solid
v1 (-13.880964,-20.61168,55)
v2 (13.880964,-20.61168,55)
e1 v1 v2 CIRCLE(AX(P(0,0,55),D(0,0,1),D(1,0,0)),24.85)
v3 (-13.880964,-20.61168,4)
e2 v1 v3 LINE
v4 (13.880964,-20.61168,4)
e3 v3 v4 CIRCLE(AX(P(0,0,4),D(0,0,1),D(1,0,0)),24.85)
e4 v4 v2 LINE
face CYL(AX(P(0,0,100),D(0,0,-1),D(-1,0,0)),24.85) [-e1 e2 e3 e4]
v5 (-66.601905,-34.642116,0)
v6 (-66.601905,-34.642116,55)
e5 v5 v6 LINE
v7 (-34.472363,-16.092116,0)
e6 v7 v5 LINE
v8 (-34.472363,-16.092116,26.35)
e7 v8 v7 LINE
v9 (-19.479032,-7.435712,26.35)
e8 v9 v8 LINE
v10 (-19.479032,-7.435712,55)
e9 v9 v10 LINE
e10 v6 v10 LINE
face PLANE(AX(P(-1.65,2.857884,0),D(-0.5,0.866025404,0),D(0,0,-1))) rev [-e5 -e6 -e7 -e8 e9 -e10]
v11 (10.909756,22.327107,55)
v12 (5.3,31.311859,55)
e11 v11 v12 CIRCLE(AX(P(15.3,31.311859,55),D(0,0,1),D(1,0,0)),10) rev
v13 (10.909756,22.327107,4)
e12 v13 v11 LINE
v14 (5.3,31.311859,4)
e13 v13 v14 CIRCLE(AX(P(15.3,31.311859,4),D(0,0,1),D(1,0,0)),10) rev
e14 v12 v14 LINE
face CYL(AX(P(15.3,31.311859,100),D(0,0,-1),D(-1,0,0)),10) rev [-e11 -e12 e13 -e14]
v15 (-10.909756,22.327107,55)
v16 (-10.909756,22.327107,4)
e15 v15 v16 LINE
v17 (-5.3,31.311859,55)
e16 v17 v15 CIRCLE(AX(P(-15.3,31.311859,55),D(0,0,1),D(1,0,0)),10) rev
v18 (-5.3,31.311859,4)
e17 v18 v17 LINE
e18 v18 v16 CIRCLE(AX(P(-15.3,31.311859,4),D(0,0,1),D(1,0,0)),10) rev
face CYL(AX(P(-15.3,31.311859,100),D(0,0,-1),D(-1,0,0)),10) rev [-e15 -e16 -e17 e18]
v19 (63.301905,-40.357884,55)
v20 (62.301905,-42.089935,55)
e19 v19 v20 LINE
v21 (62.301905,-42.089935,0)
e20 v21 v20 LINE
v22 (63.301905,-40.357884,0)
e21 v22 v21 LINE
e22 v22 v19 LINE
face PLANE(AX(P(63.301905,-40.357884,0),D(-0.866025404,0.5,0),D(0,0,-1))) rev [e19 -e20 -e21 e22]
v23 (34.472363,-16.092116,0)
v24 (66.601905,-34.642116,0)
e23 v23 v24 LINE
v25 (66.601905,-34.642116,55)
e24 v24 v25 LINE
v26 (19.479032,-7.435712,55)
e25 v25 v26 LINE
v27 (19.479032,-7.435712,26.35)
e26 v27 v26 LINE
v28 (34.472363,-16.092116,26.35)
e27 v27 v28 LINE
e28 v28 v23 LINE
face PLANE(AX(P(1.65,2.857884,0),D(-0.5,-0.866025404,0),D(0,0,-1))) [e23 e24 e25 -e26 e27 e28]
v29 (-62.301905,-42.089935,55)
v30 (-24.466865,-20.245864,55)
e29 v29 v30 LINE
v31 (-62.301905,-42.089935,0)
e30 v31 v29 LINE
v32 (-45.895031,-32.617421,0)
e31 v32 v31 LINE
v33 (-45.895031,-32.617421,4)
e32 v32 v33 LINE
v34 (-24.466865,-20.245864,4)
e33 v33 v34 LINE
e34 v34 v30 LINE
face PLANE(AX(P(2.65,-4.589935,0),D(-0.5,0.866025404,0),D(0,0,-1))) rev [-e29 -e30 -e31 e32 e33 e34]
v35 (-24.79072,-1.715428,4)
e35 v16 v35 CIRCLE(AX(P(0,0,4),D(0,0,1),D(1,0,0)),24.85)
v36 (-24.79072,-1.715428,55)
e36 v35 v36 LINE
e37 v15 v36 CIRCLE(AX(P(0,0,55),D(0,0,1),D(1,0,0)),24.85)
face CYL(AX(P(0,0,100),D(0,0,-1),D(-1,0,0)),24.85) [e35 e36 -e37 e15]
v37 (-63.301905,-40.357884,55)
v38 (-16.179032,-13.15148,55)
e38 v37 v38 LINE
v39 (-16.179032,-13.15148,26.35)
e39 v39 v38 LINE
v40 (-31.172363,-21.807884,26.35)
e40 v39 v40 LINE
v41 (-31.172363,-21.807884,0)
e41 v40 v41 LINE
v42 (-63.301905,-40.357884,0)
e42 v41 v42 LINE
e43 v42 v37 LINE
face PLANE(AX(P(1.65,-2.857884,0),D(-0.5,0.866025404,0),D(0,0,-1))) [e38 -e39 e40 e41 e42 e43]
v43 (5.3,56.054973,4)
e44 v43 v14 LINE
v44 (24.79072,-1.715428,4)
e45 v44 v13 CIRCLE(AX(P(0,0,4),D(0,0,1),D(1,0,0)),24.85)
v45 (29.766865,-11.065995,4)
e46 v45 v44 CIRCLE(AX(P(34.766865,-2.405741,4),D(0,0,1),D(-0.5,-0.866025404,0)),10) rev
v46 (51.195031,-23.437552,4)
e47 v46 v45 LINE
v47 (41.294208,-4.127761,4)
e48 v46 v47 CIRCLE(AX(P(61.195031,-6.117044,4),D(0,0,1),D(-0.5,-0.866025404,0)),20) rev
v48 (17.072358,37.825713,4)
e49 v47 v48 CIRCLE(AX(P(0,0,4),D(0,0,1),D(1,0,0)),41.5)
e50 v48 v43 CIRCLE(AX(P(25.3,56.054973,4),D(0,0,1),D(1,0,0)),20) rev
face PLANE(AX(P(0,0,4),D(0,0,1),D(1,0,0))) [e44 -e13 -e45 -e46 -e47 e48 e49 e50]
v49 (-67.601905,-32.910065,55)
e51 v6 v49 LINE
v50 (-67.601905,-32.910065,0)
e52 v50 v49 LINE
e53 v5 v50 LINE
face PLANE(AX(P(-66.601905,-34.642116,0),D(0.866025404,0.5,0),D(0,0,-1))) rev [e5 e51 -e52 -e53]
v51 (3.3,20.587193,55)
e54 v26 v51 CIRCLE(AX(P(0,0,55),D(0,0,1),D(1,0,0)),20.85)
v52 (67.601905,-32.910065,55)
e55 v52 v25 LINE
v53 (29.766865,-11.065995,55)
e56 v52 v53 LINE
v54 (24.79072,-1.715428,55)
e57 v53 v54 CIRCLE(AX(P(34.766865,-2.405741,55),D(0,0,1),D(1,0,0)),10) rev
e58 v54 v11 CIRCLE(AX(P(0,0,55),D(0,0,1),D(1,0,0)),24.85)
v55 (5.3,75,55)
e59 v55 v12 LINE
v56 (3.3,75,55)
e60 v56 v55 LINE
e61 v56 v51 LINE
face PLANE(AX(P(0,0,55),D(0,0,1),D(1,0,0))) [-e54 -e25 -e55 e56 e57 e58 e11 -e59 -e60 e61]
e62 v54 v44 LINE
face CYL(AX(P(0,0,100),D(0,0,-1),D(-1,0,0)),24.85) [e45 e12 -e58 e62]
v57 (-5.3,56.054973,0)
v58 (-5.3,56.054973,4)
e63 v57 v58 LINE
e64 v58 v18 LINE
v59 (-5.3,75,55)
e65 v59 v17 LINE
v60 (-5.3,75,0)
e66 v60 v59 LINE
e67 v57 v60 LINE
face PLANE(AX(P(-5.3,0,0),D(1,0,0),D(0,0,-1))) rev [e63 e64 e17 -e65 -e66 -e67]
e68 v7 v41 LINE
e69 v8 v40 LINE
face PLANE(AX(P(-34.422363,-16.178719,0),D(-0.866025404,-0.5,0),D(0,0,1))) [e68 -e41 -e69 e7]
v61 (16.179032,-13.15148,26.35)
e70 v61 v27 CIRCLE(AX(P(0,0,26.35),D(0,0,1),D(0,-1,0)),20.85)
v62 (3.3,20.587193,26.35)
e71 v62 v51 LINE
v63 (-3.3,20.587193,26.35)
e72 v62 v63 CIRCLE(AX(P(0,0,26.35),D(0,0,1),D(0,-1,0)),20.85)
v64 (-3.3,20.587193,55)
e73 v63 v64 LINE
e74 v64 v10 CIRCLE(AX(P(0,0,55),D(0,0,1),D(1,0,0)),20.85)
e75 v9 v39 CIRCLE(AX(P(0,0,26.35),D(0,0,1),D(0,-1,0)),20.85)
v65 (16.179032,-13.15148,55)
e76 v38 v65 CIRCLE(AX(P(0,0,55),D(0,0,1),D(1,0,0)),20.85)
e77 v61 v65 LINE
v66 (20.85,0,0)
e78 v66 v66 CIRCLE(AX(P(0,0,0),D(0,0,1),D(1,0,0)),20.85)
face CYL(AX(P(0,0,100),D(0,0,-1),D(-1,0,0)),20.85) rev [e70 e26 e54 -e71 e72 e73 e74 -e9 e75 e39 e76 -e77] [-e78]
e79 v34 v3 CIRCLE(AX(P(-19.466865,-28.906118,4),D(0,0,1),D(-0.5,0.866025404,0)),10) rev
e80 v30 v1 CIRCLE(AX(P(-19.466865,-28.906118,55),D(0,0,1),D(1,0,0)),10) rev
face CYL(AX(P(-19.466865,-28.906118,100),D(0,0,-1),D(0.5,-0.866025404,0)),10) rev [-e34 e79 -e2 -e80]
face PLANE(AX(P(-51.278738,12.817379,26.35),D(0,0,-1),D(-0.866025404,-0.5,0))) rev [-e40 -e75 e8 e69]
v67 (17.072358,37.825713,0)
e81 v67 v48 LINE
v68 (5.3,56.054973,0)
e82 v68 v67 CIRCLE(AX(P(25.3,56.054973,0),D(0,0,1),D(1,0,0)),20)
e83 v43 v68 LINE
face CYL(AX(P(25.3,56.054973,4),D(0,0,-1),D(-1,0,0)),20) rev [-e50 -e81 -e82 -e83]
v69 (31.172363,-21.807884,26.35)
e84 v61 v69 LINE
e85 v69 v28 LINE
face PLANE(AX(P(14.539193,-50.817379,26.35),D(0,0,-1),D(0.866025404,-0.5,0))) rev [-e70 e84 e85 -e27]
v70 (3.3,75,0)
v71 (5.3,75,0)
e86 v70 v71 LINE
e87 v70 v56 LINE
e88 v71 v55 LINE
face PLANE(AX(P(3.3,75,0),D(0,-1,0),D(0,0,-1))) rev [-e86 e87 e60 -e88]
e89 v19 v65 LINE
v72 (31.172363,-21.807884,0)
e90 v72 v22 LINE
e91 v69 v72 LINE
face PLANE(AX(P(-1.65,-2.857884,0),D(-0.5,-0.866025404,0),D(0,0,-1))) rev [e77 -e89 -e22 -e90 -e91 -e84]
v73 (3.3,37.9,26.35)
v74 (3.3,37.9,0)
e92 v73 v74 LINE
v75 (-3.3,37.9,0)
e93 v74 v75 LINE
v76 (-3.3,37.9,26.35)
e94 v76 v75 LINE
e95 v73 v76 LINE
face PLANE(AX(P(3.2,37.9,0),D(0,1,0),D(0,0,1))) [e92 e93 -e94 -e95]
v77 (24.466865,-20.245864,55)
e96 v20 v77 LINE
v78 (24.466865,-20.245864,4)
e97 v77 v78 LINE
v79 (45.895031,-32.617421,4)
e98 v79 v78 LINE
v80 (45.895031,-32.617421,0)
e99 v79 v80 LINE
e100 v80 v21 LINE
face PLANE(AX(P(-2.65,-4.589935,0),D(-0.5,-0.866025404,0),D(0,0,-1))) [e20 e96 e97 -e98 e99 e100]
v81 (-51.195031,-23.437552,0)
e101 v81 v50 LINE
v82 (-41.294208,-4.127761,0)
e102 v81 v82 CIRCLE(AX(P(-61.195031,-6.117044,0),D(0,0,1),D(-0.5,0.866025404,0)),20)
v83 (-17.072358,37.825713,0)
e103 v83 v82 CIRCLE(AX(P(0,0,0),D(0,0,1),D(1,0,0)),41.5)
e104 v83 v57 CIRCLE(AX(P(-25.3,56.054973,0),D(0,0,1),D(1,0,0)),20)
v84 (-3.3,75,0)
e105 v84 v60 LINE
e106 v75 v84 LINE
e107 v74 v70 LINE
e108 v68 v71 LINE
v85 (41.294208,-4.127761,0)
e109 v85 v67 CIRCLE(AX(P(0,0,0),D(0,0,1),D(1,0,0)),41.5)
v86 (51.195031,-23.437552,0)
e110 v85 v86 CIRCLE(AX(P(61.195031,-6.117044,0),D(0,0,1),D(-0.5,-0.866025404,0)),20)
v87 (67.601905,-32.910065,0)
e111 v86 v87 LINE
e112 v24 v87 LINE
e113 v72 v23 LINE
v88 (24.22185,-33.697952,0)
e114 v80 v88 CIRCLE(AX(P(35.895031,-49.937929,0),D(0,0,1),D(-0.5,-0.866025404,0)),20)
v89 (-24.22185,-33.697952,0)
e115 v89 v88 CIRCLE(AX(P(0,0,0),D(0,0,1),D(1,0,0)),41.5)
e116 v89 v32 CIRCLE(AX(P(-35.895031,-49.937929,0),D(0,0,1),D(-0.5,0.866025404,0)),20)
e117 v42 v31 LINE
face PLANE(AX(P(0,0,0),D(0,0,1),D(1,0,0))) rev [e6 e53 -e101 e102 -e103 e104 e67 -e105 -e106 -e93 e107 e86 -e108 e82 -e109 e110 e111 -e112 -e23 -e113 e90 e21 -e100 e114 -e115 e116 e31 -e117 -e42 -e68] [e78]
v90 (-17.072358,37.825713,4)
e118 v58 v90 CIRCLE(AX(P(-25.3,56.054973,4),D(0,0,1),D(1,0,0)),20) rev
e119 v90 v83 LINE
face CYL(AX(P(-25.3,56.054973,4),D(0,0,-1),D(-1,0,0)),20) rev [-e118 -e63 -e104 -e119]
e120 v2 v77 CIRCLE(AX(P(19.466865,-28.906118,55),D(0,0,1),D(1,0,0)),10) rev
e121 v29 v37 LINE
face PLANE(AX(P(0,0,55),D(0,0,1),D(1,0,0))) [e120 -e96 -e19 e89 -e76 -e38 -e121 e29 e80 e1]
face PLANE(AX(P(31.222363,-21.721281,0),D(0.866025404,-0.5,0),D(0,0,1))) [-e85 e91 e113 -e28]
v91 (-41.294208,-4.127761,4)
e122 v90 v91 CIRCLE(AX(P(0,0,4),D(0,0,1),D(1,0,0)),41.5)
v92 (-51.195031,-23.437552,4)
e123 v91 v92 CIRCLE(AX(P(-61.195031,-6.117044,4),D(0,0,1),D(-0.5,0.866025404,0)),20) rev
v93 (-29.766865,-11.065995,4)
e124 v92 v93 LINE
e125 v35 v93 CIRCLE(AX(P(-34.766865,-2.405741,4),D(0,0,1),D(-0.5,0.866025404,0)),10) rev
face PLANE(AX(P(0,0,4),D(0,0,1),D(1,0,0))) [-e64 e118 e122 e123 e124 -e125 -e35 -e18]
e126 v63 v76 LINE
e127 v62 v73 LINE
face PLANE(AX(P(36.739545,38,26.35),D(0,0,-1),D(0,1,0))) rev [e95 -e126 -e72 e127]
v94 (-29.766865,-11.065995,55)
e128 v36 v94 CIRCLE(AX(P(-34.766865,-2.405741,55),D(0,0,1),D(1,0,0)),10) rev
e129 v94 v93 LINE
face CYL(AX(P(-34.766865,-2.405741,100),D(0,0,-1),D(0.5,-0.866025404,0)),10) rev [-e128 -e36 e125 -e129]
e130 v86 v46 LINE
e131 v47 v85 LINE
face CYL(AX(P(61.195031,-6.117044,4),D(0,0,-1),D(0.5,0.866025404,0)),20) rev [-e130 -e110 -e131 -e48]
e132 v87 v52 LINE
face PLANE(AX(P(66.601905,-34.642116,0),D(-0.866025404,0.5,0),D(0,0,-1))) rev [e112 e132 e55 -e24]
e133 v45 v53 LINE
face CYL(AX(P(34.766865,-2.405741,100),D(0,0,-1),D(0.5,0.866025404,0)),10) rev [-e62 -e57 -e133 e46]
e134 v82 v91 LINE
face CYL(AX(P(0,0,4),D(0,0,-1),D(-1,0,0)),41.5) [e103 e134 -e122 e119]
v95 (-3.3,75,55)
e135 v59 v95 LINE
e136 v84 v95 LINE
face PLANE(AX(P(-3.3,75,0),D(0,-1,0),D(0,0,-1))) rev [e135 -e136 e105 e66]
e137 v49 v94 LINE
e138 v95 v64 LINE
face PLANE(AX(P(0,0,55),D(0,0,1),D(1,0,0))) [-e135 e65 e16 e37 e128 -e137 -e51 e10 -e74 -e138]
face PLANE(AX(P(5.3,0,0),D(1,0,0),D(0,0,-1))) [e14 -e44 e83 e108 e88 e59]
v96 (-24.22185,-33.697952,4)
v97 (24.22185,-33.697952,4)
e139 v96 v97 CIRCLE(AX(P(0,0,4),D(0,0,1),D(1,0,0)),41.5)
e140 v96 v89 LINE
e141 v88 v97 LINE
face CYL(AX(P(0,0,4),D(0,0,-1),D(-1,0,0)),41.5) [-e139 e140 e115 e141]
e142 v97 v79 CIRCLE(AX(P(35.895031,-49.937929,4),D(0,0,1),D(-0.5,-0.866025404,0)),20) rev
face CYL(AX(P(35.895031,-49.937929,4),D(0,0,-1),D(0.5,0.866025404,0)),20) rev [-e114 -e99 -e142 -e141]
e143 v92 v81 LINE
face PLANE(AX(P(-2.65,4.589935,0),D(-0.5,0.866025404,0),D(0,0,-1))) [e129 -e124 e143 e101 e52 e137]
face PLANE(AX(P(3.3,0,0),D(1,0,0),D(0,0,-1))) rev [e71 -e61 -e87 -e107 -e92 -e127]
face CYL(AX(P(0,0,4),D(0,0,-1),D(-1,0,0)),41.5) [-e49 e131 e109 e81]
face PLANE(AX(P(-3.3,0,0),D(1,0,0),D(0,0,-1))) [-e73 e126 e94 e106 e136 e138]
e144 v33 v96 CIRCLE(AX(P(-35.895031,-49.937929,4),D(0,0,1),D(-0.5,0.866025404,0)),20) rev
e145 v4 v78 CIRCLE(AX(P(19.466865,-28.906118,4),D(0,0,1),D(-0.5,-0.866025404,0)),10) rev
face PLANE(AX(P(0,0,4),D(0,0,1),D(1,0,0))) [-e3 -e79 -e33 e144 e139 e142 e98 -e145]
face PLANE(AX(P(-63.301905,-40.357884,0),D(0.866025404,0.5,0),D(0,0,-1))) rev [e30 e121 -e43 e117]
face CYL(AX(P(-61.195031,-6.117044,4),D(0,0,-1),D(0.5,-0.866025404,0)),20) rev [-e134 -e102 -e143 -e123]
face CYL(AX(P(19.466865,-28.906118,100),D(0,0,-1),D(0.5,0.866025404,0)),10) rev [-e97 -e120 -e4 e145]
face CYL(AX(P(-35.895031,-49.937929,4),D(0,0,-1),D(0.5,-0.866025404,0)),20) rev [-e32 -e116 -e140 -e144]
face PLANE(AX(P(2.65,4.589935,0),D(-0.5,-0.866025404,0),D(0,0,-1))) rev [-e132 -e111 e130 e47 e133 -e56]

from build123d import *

# Parameters (mm, degrees)
SKETCH1_R                       = 20.75
BOSS_EXTRUDE1_DEPTH             = 100
BOSS_EXTRUDE2_DEPTH             = 3.2
THICKEN1_OUTLINE_R              = 24.85
THICKEN1_OUTLINE_R_2            = 20.85
THICKEN1_DEPTH                  = 100
THICKEN2_START                  = 26.35
THICKEN2_DEPTH                  = 73.65
THICKEN2_2_OUTLINE_W            = 2
THICKEN2_2_OUTLINE_H            = 37
THICKEN2_2_DEPTH                = 26.35
THICKEN3_START                  = 26.35
THICKEN3_DEPTH                  = 73.65
THICKEN3_2_OUTLINE_W            = 2
THICKEN3_2_OUTLINE_H            = 37
THICKEN3_2_DEPTH                = 26.35
BOSS_EXTRUDE4_REACH             = 129.446
SKETCH4_W                       = 26.35
SKETCH4_H                       = 17.15
BOSS_EXTRUDE4_DIRECTION_2_REACH = 129.446
FILLET1_R                       = 10
SKETCH3_R                       = 41.5
BOSS_EXTRUDE3_DEPTH             = 4
FILLET2_R                       = 20
CIRPATTERN4_COUNT               = 3
MOVE_FACE3_BY                   = 0.1
MOVE_FACE4_BY                   = 0.1
MOVE_FACE4_2_BY                 = 0.1
MOVE_FACE4_3_BY                 = 0.1
MOVE_START                      = 26.35
MOVE_FACE5_OUTLINE_W            = 6.6
MOVE_FACE5_OUTLINE_H            = 20.75
MOVE_FACE5_DEPTH                = 73.65
CIRPATTERN1_COUNT               = 3
SKETCH5_R                       = 108.755446709
CUT_EXTRUDE1_DEPTH              = 45


with BuildPart() as part:
    # Sketch1 → Boss-Extrude1 (new body)
    with BuildSketch(Plane.XY):
        Circle(SKETCH1_R)
    extrude(amount=BOSS_EXTRUDE1_DEPTH)

    # Move Face3: a curved face moved outward by 0.1
    add(Solid.thicken(part.faces().sort_by_distance((-20.75, 0, 50))[0], MOVE_FACE3_BY))


with BuildPart() as body_2:
    # Sketch2 → Boss-Extrude2 (new, symmetric)
    with BuildSketch(Plane(origin=(0, 0, 0), x_dir=(0, 0, -1), z_dir=(1, 0, 0))):
        Polygon((-26.35, 20.75), (-26.35, 38), (0, 38), (0, 75), (-100, 75), (-100, 20.75), align=None)
    extrude(amount=BOSS_EXTRUDE2_DEPTH, both=True)

    # Move Face4: a face moved outward by 0.1
    extrude(body_2.faces().sort_by_distance((0, 38, 13.175))[0], amount=MOVE_FACE4_BY, dir=(0, -1, 0))

    # Move Face4 2: a face moved outward by 0.1
    extrude(body_2.faces().sort_by_distance((-3.2, 49.566782958, 53.367562563))[0], amount=MOVE_FACE4_2_BY, dir=(-1, 0, 0))

    # Move Face4 3: a face moved outward by 0.1
    extrude(body_2.faces().sort_by_distance((3.2, 49.566782958, 53.367562563))[0], amount=MOVE_FACE4_3_BY, dir=(1, 0, 0))

    # Move Face5: read off the stored shape, not the designer's step
    # Move Face5 outline → Move Face5 (add)
    with BuildSketch(Plane.XY.offset(MOVE_START)):
        with Locations((0, 10.375)):
            Rectangle(MOVE_FACE5_OUTLINE_W, MOVE_FACE5_OUTLINE_H)
    extrude(amount=MOVE_FACE5_DEPTH)


with BuildPart() as body_3:
    # Thicken1: read off the stored shape, not the designer's step
    # Thicken1 outline → Thicken1 (new body)
    with BuildSketch(Plane.XY):
        Circle(THICKEN1_OUTLINE_R)
        Circle(THICKEN1_OUTLINE_R_2, mode=Mode.SUBTRACT)
    extrude(amount=THICKEN1_DEPTH)

    # Thicken2: read off the stored shape, not the designer's step
    # Thicken2 outline → Thicken2 (add)
    with BuildSketch(Plane.XY.offset(THICKEN2_START)):
        with BuildLine():
            ThreePointArc((-5.3, 24.27823099), (-4.303593806, 24.474508787), (-3.3, 24.629910678))
            Line((-3.3, 24.629910678), (-3.3, 75))
            Line((-3.3, 75), (-5.3, 75))
            Line((-5.3, 75), (-5.3, 24.27823099))
        make_face()
    extrude(amount=THICKEN2_DEPTH)

    # Thicken2 2 outline → Thicken2 2 (add)
    with BuildSketch(Plane.XY):
        with Locations((-4.3, 56.5)):
            Rectangle(THICKEN2_2_OUTLINE_W, THICKEN2_2_OUTLINE_H)
    extrude(amount=THICKEN2_2_DEPTH)

    # Thicken3: read off the stored shape, not the designer's step
    # Thicken3 outline → Thicken3 (add)
    with BuildSketch(Plane.XY.offset(THICKEN3_START)):
        with BuildLine():
            Line((3.3, 75), (3.3, 24.629910678))
            ThreePointArc((3.3, 24.629910678), (4.303593806, 24.474508787), (5.3, 24.27823099))
            Line((5.3, 24.27823099), (5.3, 75))
            Line((5.3, 75), (3.3, 75))
        make_face()
    extrude(amount=THICKEN3_DEPTH)

    # Thicken3 2 outline → Thicken3 2 (add)
    with BuildSketch(Plane.XY):
        with Locations((4.3, 56.5)):
            Rectangle(THICKEN3_2_OUTLINE_W, THICKEN3_2_OUTLINE_H)
    extrude(amount=THICKEN3_2_DEPTH)

    # Boss-Extrude4: up to this face of the body (flat: up to its plane)
    boss_extrude4_end = Plane(body_3.part.faces().sort_by_distance((5.3, 51.059106065, 52.826548797))[0])
    # Sketch4 → Boss-Extrude4 (add, up to the picked face)
    with BuildSketch(Plane(origin=(0, 0, 0), x_dir=(0, 0, -1), z_dir=(1, 0, 0)), mode=Mode.PRIVATE) as boss_extrude4_sk1:
        with Locations((-13.175, 29.425)):
            Rectangle(SKETCH4_W, SKETCH4_H)
    boss_extrude4_tool1 = split(extrude(boss_extrude4_sk1.sketch, amount=BOSS_EXTRUDE4_REACH, mode=Mode.PRIVATE), bisect_by=boss_extrude4_end, keep=Keep.BOTH, mode=Mode.PRIVATE)
    add(boss_extrude4_tool1.solids().sort_by(Axis((0, 29.425, 13.175), (1, 0, 0)))[0])

    # Boss-Extrude4 direction 2: up to this face of the body (flat: up to its plane)
    boss_extrude4_direction_2_end = Plane(body_3.part.faces().sort_by_distance((-5.3, 51.059106065, 52.826548797))[0])
    # Sketch4 → Boss-Extrude4 direction 2 (add, up to the picked face)
    with BuildSketch(Plane(origin=(0, 0, 0), x_dir=(0, 0, -1), z_dir=(1, 0, 0)), mode=Mode.PRIVATE) as boss_extrude4_direction_2_sk1:
        with Locations((-13.175, 29.425)):
            Rectangle(SKETCH4_W, SKETCH4_H)
    boss_extrude4_direction_2_tool1 = split(extrude(boss_extrude4_direction_2_sk1.sketch, amount=-BOSS_EXTRUDE4_DIRECTION_2_REACH, mode=Mode.PRIVATE), bisect_by=boss_extrude4_direction_2_end, keep=Keep.BOTH, mode=Mode.PRIVATE)
    add(boss_extrude4_direction_2_tool1.solids().sort_by(Axis((0, 29.425, 13.175), (-1, 0, 0)))[0])

    # Fillet1
    fillet1_edges = [body_3.edges().sort_by_distance(p)[0] for p in [
        (-5.3, 24.27823099, 50),
        (5.3, 24.27823099, 50),
    ]]
    fillet(fillet1_edges, radius=FILLET1_R)

    # Sketch3 → Boss-Extrude3 (add)
    with BuildSketch(Plane.XY):
        Circle(SKETCH3_R)
    extrude(amount=BOSS_EXTRUDE3_DEPTH)

    # Fillet2
    fillet2_edges = [body_3.edges().sort_by_distance(p)[0] for p in [
        (-5.3, 41.160174927, 2),
        (5.3, 41.160174927, 2),
    ]]
    fillet(fillet2_edges, radius=FILLET2_R)


with BuildPart() as cirpattern4_1:
    # CirPattern4: pattern copy
    add(body_3.part.rotate(Axis((0, 0, 0), (0, 0, 1)), 1 * 360 / CIRPATTERN4_COUNT))


with BuildPart() as cirpattern4_2:
    # CirPattern4: pattern copy
    add(body_3.part.rotate(Axis((0, 0, 0), (0, 0, 1)), 2 * 360 / CIRPATTERN4_COUNT))

    # Combine2: read off the stored shape, not the designer's step
    # Combine2: union CirPattern4_1, body 3
    add(cirpattern4_1.part)
    add(body_3.part)


with BuildPart() as cirpattern1_1:
    # CirPattern1: pattern copy
    add(body_2.part.rotate(Axis((0, 0, 0), (0, 0, 1)), 1 * 360 / CIRPATTERN1_COUNT))


with BuildPart() as cirpattern1_2:
    # CirPattern1: pattern copy
    add(body_2.part.rotate(Axis((0, 0, 0), (0, 0, 1)), 2 * 360 / CIRPATTERN1_COUNT))


with BuildPart() as cirpattern4_2_1:
    add(cirpattern4_2.part)

    # Combine3: read off the stored shape, not the designer's step
    # Combine3: cut CirPattern1_2, CirPattern1_1, body 2, part
    add(cirpattern1_2.part, mode=Mode.SUBTRACT)
    add(cirpattern1_1.part, mode=Mode.SUBTRACT)
    add(body_2.part, mode=Mode.SUBTRACT)
    add(part.part, mode=Mode.SUBTRACT)

    # Sketch5 → Cut-Extrude1 (cut)
    with BuildSketch(Plane.XY.offset(100)):
        Circle(SKETCH5_R)
    extrude(amount=-CUT_EXTRUDE1_DEPTH, mode=Mode.SUBTRACT)


solid = cirpattern4_2_1.part
